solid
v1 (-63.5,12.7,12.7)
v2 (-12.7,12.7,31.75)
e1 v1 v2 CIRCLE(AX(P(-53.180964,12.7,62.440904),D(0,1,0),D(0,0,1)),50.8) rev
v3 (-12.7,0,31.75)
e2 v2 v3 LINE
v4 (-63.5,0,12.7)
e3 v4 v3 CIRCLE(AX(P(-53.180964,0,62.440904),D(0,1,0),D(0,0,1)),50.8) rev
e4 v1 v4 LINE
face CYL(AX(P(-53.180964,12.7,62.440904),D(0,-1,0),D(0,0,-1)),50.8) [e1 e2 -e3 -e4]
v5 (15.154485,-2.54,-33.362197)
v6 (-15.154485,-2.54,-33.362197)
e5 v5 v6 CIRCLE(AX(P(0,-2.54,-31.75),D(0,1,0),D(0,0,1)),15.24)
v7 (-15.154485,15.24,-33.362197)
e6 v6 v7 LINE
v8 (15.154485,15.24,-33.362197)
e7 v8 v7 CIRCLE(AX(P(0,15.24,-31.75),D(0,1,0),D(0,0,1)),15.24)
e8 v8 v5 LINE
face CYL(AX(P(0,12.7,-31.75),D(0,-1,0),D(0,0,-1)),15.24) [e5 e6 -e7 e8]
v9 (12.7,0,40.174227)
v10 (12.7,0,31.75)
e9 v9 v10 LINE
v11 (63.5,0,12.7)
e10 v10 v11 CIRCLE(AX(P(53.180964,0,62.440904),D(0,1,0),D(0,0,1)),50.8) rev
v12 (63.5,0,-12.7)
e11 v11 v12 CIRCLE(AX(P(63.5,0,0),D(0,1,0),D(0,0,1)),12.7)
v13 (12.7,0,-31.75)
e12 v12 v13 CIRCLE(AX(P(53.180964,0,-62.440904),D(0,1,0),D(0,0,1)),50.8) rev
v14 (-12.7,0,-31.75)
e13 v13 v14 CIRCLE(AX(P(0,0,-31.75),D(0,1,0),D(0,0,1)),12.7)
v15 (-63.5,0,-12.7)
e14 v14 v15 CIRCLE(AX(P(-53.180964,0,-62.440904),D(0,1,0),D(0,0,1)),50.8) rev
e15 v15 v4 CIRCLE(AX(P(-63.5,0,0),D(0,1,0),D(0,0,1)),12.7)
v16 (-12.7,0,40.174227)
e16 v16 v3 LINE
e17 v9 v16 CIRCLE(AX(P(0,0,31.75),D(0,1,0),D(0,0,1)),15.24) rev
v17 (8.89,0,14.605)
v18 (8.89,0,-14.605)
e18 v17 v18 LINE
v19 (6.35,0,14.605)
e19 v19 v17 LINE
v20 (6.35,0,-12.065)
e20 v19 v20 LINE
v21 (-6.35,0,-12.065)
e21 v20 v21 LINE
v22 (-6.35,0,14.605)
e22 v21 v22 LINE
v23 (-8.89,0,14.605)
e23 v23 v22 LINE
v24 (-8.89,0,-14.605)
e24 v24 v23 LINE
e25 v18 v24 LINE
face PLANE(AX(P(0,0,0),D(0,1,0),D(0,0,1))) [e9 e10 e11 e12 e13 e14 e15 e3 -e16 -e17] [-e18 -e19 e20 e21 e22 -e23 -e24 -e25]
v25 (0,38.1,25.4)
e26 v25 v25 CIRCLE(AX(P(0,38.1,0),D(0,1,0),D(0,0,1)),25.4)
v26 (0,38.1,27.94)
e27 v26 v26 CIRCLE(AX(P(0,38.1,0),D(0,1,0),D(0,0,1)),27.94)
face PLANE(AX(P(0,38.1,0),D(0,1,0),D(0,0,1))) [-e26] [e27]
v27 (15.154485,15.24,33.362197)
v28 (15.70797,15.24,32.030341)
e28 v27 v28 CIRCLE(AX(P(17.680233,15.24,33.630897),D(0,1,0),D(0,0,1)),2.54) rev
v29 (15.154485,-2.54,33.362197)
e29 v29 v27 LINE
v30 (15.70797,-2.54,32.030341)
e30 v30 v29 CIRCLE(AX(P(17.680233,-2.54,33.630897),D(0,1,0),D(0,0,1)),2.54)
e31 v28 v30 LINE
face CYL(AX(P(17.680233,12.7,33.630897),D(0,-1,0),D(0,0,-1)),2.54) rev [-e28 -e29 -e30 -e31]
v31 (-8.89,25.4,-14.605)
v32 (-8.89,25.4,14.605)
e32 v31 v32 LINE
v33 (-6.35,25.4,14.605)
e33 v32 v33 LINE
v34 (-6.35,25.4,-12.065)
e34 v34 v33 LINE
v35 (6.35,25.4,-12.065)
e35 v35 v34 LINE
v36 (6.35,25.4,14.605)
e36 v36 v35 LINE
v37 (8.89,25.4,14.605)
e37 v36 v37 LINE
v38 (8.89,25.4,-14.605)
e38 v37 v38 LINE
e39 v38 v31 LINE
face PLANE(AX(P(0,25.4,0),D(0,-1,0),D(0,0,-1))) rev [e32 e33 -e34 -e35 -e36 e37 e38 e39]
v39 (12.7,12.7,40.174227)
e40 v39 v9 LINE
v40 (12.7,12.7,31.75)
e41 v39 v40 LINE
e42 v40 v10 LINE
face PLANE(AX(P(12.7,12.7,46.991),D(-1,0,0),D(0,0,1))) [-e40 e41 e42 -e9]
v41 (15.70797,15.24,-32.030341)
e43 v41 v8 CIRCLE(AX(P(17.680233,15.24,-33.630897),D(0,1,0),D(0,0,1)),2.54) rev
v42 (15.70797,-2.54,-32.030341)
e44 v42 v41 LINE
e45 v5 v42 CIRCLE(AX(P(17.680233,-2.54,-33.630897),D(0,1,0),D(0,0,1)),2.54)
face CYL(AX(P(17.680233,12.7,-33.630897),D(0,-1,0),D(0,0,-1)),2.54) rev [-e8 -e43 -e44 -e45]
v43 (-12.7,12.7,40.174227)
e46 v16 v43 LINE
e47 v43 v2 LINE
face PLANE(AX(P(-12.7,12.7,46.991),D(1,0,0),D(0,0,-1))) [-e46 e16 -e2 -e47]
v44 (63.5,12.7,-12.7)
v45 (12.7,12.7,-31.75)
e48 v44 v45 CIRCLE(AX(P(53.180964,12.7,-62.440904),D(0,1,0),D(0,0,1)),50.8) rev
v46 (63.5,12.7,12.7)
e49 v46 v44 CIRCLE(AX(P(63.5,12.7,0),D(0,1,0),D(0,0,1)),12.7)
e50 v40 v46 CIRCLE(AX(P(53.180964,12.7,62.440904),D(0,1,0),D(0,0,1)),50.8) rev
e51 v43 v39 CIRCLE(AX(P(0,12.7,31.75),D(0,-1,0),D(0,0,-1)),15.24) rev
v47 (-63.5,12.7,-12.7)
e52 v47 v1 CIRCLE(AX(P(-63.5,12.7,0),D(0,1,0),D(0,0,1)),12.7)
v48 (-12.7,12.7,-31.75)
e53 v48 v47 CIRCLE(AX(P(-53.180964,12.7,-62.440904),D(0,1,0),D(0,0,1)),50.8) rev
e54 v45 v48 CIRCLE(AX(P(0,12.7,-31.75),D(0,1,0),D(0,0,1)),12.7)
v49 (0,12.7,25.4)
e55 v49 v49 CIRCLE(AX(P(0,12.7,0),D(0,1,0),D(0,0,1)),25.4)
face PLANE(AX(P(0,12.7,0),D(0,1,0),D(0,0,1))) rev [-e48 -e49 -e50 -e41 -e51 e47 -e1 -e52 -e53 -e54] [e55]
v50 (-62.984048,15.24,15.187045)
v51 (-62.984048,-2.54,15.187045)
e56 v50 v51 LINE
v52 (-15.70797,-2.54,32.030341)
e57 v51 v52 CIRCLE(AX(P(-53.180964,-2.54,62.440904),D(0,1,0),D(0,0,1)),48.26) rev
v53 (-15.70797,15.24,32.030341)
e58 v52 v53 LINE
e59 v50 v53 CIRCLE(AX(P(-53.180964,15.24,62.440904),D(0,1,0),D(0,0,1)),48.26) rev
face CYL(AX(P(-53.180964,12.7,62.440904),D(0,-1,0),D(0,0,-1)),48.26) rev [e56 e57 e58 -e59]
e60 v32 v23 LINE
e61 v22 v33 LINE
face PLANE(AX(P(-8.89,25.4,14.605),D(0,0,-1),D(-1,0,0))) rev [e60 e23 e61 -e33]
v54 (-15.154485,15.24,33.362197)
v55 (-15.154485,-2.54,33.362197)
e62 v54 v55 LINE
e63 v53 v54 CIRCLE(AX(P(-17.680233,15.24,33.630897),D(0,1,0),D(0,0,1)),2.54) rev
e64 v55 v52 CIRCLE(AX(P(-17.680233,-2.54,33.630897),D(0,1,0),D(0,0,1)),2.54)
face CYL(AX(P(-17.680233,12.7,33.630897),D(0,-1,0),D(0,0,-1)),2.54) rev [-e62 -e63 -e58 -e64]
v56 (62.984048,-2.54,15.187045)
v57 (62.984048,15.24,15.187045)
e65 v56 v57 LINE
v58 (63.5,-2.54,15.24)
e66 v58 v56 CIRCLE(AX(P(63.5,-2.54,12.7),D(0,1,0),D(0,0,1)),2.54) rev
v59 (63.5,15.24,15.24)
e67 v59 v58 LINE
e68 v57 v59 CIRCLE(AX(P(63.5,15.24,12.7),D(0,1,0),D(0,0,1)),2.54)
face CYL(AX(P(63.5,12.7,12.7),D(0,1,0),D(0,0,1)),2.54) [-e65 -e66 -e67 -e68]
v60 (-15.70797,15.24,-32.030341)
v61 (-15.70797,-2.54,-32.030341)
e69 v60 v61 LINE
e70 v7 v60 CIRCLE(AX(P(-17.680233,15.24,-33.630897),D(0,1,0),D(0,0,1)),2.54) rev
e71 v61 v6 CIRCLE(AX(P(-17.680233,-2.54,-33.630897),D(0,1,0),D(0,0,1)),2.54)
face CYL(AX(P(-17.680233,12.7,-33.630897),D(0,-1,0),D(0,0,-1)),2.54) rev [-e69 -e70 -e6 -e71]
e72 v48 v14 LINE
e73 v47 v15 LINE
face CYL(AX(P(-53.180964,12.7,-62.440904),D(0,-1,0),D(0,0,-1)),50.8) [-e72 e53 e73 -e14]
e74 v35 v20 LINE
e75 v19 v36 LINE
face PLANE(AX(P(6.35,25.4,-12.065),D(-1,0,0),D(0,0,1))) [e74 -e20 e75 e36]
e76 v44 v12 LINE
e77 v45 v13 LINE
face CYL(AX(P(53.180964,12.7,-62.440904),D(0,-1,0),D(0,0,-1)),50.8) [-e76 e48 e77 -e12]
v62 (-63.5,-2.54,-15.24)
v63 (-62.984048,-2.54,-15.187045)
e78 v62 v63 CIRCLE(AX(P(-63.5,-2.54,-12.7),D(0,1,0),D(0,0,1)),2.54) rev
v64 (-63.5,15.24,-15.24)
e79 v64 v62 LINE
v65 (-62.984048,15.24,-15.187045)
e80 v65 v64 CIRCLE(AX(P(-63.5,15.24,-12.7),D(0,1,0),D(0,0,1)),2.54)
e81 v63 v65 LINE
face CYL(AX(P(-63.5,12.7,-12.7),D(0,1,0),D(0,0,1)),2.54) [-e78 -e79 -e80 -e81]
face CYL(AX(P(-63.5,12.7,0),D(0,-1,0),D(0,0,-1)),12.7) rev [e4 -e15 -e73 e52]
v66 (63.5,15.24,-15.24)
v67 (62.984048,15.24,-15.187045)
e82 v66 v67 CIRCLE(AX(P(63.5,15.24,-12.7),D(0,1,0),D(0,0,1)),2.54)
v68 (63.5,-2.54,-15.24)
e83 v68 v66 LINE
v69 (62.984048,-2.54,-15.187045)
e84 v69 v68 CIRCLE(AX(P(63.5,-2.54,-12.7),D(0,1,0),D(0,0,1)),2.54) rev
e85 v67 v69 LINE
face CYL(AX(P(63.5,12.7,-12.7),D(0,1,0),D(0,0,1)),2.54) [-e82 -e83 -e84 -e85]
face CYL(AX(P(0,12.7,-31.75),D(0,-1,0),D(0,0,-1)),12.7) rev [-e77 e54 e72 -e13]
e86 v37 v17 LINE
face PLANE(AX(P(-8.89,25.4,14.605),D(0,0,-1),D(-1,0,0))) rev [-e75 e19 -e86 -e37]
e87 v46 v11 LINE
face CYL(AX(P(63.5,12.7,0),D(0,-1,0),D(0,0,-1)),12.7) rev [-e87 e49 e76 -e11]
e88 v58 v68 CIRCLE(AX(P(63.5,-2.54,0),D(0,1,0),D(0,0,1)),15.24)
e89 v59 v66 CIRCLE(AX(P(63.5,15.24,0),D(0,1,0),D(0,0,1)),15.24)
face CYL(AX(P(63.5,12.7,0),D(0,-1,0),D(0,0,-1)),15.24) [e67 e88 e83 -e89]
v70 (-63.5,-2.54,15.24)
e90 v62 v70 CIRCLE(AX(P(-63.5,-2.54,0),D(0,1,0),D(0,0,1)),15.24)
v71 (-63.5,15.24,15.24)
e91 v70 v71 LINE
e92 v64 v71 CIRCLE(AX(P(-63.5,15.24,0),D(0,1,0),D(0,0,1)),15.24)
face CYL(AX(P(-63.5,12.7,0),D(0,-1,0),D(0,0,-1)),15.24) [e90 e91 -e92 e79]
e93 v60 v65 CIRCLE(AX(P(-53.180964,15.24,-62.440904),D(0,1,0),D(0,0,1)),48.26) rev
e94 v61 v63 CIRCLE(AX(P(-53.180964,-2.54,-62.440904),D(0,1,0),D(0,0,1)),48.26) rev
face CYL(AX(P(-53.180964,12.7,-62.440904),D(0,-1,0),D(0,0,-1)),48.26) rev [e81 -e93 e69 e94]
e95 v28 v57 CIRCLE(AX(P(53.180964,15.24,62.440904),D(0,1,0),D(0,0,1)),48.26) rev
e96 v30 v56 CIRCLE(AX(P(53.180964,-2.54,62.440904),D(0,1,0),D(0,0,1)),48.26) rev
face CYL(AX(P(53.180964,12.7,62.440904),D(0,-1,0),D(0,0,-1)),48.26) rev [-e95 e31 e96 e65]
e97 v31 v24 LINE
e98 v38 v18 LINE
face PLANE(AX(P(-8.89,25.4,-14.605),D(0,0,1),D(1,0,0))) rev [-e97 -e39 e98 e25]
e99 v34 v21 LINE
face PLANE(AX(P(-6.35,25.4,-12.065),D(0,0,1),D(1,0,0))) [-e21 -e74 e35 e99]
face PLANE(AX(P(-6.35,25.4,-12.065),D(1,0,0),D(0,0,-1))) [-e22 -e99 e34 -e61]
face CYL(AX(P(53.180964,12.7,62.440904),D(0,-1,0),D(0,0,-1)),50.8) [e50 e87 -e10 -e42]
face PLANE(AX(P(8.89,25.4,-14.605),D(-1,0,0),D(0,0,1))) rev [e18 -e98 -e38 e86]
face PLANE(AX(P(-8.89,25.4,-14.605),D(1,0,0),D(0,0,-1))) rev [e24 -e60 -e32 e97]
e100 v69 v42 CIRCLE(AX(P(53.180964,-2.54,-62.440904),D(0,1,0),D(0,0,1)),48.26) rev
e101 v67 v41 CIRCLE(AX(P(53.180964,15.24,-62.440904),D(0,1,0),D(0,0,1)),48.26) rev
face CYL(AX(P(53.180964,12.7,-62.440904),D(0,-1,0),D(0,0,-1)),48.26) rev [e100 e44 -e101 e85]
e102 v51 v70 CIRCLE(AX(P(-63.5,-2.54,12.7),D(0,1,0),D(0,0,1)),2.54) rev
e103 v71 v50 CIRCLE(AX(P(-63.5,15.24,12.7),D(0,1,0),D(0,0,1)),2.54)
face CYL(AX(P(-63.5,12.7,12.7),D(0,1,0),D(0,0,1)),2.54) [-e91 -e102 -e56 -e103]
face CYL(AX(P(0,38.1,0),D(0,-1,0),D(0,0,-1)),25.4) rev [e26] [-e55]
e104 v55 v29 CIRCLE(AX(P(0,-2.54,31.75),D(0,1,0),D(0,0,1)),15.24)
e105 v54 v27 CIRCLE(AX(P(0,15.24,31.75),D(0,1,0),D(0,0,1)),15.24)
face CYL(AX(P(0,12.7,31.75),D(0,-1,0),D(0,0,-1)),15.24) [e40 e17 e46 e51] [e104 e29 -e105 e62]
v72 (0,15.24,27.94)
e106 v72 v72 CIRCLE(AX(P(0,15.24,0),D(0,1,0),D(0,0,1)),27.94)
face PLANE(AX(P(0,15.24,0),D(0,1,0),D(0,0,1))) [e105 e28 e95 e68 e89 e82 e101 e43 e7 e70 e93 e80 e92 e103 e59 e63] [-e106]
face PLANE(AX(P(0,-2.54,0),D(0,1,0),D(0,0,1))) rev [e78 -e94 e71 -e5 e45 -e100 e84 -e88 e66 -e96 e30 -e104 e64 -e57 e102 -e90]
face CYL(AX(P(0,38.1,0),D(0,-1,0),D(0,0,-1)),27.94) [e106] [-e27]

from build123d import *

# Parameters (mm, degrees)
BOSS_EXTRUDE6_DEPTH = 12.7
SKETCH10_R          = 25.4
BOSS_EXTRUDE7_DEPTH = 25.4
SHELL14_T           = 2.5399999999999943
FILLET1_R           = 2.54
BOSS_EXTRUDE8_DEPTH = 25.4
SKETCH12_W          = 12.7
SKETCH12_H          = 2.5399999999999974
CUT_EXTRUDE6_DEPTH  = 25.4
CUT_EXTRUDE7_REACH  = 108.984
SKETCH15_W          = 25.4
SKETCH15_H          = 12.699999999999998


with BuildPart() as part:
    # Sketch9 → Boss-Extrude6 (new body)
    with BuildSketch(Plane(origin=(0, 0, 0), x_dir=(1, 0, 0), z_dir=(0, 1, 0))):
        with BuildLine():
            ThreePointArc((-63.5, 12.699999999999985), (-76.2, -1.232e-14), (-63.5, -12.700000000000014))
            ThreePointArc((-63.5, -12.700000000000014), (-35.34389302544592, -14.875381401189138), (-12.7, -31.75))
            ThreePointArc((-12.7, -31.75), (1.154e-14, -44.45000000000002), (12.7, -31.75))
            ThreePointArc((12.7, -31.75), (35.34389302544593, -14.875381401189138), (63.5, -12.700000000000001))
            ThreePointArc((63.5, -12.700000000000001), (76.2, 1.68e-15), (63.5, 12.700000000000001))
            ThreePointArc((63.5, 12.700000000000001), (35.34389302544591, 14.87538140118913), (12.7, 31.75))
            ThreePointArc((12.7, 31.75), (4.06e-15, 44.44999999999999), (-12.7, 31.75))
            ThreePointArc((-12.7, 31.75), (-35.34389302544592, 14.87538140118913), (-63.5, 12.699999999999985))
        make_face()
    extrude(amount=BOSS_EXTRUDE6_DEPTH)

    # Sketch10 → Boss-Extrude7 (add)
    with BuildSketch(Plane(origin=(0, 12.7, 0), x_dir=(1, 0, 0), z_dir=(0, 1, 0))):
        with Locations(Location((0, 0, 0), (0, 0, 270))):
            Circle(SKETCH10_R)
    extrude(amount=BOSS_EXTRUDE7_DEPTH)

    # Shell14
    shell14_openings = [part.faces().sort_by_distance(p)[0] for p in [
        (0, 38.1, 0),
    ]]
    offset(amount=SHELL14_T, openings=shell14_openings, kind=Kind.INTERSECTION)

    # Fillet1
    # the kernel refuses this fillet: 2.54 mm, written as the material it adds along each edge
    with BuildSketch(Plane(origin=(15.213395442859193, 15.239999999999993, 32.65011060386543), x_dir=(-0.08244746024425967, 0, 0.9965954125417552), z_dir=(0, -1, 0))) as fillet1_piece_1:
        with BuildLine():
            CenterArc((0.7740627209529523, -2.5393019901274583), FILLET1_R, 91.3432643866729, 32.987937528232266)
            ThreePointArc((-0.6584359095530802, -0.44179211563381704), (-0.33012530713560906, -0.2195437625751302), (0, 0))
            ThreePointArc((0, 0), (0.357259717362898, -0.00418805923524796), (0.7145194347258012, 0))
        make_face()
    extrude(amount=17.779999999999987)
    with BuildSketch(Plane(origin=(-15.213395442859223, 15.239999999999993, 32.65011060386536), x_dir=(-0.623740024012636, 0, -0.7816318714361103), z_dir=(0, -1, 0))) as fillet1_piece_2:
        with BuildLine():
            CenterArc((0.7720512245924565, -2.5399142898215286), FILLET1_R, 89.52930650878288, 32.98793752823278)
            ThreePointArc((-0.5933344507841877, -0.3981108540515074), (-0.2943337523500303, -0.20253317683271896), (0, 0))
            ThreePointArc((0, 0), (0.396458736952872, 0.00162849339096533), (0.7929174739057625, 3e-17))
        make_face()
    extrude(amount=17.779999999999987)
    with BuildSketch(Plane(origin=(-15.213395442859191, 15.239999999999993, -32.6501106038654), x_dir=(-0.6237400240126415, 0, 0.781631871436106), z_dir=(0, -1, 0))) as fillet1_piece_3:
        with BuildLine():
            CenterArc((0.7720512245925322, 2.5399142898215272), FILLET1_R, 237.48275596298424, 32.987937528232294)
            ThreePointArc((-0.593334450784115, 0.3981108540515081), (-0.2943337523499901, 0.20253317683272415), (0, 0))
            ThreePointArc((0, 0), (0.3964587369529053, -0.00162849339097196), (0.7929174739058125, 2e-17))
        make_face()
    extrude(amount=17.779999999999987)
    with BuildSketch(Plane(origin=(15.21339544285919, 15.239999999999993, -32.65011060386541), x_dir=(-0.08244746024426708, 0, -0.9965954125417545), z_dir=(0, -1, 0))) as fillet1_piece_4:
        with BuildLine():
            CenterArc((0.7740627209529621, 2.539301990127459), FILLET1_R, 235.66879808509486, 32.987937528232465)
            ThreePointArc((-0.6584359095530695, 0.44179211563381504), (-0.330125307135611, 0.21954376257513125), (0, 0))
            ThreePointArc((0, 0), (0.3572597173629123, 0.00418805923525002), (0.714519434725823, 0))
        make_face()
    extrude(amount=17.779999999999987)
    # the kernel refuses this fillet: 2.54 mm, written as the material it takes off along each edge
    with BuildSketch(Plane(origin=(63.22420496202578, 15.929515824336315, 15.23750429358524), x_dir=(-0.9786320251398054, 0, -0.2056194528024121), z_dir=(0, -1, 0))) as fillet1_2_piece_1:
        with BuildLine():
            CenterArc((0.25185838779454184, 2.5399917904261593), FILLET1_R, 258.13423637706234, 11.720089907990712)
            ThreePointArc((-0.2704150223235917, 0.05426644657105567), (-0.13533027474319617, 0.02652148032641584), (0, 0))
            ThreePointArc((0, 0), (0.12270024020757794, 0.00015598190298779), (0.2454004804151519, 0))
        make_face()
    extrude(amount=19.15903164867263, mode=Mode.SUBTRACT)
    with BuildSketch(Plane(origin=(-63.22420496202586, 15.929515824336706, 15.237504293585257), x_dir=(-0.9999590590960623, 0, 0.009048764098899606), z_dir=(0, -1, 0))) as fillet1_2_piece_2:
        with BuildLine():
            CenterArc((0.2528224689234374, 2.5398960101039973), FILLET1_R, 258.79837316015426, 11.720089907990541)
            ThreePointArc((-0.24060352948943128, 0.04828392470822683), (-0.12027107442804234, 0.02429489521037388), (0, 0))
            ThreePointArc((0, 0), (0.1379031648673247, -0.00062393937600912), (0.27580632973464947, 0))
        make_face()
    extrude(amount=19.159031648673412, mode=Mode.SUBTRACT)
    with BuildSketch(Plane(origin=(-63.22420496202585, 15.92951582433667, -15.237504293585229), x_dir=(-0.9999590590960623, 0, -0.00904876409889914), z_dir=(0, -1, 0))) as fillet1_2_piece_3:
        with BuildLine():
            CenterArc((0.2528224689234528, -2.5398960101039973), FILLET1_R, 89.48153693185522, 11.720089907991053)
            ThreePointArc((-0.2406035294894384, -0.04828392470823043), (-0.12027107442802101, -0.02429489521037413), (0, 0))
            ThreePointArc((0, 0), (0.1379031648673247, 0.00062393937600918), (0.2758063297346637, 0))
        make_face()
    extrude(amount=19.15903164867334, mode=Mode.SUBTRACT)
    with BuildSketch(Plane(origin=(63.22420496202587, 15.929515824336635, -15.237504293585246), x_dir=(0.9999590590960625, 0, -0.00904876409889984), z_dir=(0, -1, 0))) as fillet1_2_piece_4:
        with BuildLine():
            CenterArc((0.25282246892342264, 2.539896010103998), FILLET1_R, 258.79837316015426, 11.720089907990712)
            ThreePointArc((-0.24060352948944552, 0.04828392470822666), (-0.12027107442801392, 0.02429489521037056), (0, 0))
            ThreePointArc((0, 0), (0.13790316486732473, -0.00062393937600909), (0.2758063297346424, 0))
        make_face()
    extrude(amount=19.15903164867327, mode=Mode.SUBTRACT)

    # Sketch11 → Boss-Extrude8 (add)
    with BuildSketch(Plane(origin=(0, 0, 0), x_dir=(1, 0, 0), z_dir=(0, 1, 0))):
        Polygon((8.889999999999997, 14.605), (8.890000000000002, -14.605), (-8.889999999999999, -14.604999999999997), (-8.890000000000002, 14.605), align=None)
        Polygon((-6.350000000000001, 12.065), (6.349999999999998, 12.065), (6.3500000000000005, -12.065), (-6.349999999999999, -12.065), align=None, mode=Mode.SUBTRACT)
    extrude(amount=BOSS_EXTRUDE8_DEPTH)

    # Sketch12 → Cut-Extrude6 (cut)
    with BuildSketch(Plane(origin=(0, 25.4, 0), x_dir=(1, 0, 0), z_dir=(0, 1, 0))):
        with Locations((8.9e-16, -13.334999999999997)):
            Rectangle(SKETCH12_W, SKETCH12_H)
    extrude(amount=-CUT_EXTRUDE6_DEPTH, mode=Mode.SUBTRACT)

    # Sketch15 → Cut-Extrude7 (cut, up to next)
    with BuildSketch(Plane.XY.offset(14.604999999999999), mode=Mode.PRIVATE) as cut_extrude7_sk1:
        with Locations((1.865e-14, 6.349999999999999)):
            Rectangle(SKETCH15_W, SKETCH15_H)
    cut_extrude7_tool1 = extrude(cut_extrude7_sk1.sketch, amount=CUT_EXTRUDE7_REACH, mode=Mode.PRIVATE) & part.part
    add(cut_extrude7_tool1.solids().sort_by_distance((0, 6.35, 14.605))[0], mode=Mode.SUBTRACT)


solid = part.part
